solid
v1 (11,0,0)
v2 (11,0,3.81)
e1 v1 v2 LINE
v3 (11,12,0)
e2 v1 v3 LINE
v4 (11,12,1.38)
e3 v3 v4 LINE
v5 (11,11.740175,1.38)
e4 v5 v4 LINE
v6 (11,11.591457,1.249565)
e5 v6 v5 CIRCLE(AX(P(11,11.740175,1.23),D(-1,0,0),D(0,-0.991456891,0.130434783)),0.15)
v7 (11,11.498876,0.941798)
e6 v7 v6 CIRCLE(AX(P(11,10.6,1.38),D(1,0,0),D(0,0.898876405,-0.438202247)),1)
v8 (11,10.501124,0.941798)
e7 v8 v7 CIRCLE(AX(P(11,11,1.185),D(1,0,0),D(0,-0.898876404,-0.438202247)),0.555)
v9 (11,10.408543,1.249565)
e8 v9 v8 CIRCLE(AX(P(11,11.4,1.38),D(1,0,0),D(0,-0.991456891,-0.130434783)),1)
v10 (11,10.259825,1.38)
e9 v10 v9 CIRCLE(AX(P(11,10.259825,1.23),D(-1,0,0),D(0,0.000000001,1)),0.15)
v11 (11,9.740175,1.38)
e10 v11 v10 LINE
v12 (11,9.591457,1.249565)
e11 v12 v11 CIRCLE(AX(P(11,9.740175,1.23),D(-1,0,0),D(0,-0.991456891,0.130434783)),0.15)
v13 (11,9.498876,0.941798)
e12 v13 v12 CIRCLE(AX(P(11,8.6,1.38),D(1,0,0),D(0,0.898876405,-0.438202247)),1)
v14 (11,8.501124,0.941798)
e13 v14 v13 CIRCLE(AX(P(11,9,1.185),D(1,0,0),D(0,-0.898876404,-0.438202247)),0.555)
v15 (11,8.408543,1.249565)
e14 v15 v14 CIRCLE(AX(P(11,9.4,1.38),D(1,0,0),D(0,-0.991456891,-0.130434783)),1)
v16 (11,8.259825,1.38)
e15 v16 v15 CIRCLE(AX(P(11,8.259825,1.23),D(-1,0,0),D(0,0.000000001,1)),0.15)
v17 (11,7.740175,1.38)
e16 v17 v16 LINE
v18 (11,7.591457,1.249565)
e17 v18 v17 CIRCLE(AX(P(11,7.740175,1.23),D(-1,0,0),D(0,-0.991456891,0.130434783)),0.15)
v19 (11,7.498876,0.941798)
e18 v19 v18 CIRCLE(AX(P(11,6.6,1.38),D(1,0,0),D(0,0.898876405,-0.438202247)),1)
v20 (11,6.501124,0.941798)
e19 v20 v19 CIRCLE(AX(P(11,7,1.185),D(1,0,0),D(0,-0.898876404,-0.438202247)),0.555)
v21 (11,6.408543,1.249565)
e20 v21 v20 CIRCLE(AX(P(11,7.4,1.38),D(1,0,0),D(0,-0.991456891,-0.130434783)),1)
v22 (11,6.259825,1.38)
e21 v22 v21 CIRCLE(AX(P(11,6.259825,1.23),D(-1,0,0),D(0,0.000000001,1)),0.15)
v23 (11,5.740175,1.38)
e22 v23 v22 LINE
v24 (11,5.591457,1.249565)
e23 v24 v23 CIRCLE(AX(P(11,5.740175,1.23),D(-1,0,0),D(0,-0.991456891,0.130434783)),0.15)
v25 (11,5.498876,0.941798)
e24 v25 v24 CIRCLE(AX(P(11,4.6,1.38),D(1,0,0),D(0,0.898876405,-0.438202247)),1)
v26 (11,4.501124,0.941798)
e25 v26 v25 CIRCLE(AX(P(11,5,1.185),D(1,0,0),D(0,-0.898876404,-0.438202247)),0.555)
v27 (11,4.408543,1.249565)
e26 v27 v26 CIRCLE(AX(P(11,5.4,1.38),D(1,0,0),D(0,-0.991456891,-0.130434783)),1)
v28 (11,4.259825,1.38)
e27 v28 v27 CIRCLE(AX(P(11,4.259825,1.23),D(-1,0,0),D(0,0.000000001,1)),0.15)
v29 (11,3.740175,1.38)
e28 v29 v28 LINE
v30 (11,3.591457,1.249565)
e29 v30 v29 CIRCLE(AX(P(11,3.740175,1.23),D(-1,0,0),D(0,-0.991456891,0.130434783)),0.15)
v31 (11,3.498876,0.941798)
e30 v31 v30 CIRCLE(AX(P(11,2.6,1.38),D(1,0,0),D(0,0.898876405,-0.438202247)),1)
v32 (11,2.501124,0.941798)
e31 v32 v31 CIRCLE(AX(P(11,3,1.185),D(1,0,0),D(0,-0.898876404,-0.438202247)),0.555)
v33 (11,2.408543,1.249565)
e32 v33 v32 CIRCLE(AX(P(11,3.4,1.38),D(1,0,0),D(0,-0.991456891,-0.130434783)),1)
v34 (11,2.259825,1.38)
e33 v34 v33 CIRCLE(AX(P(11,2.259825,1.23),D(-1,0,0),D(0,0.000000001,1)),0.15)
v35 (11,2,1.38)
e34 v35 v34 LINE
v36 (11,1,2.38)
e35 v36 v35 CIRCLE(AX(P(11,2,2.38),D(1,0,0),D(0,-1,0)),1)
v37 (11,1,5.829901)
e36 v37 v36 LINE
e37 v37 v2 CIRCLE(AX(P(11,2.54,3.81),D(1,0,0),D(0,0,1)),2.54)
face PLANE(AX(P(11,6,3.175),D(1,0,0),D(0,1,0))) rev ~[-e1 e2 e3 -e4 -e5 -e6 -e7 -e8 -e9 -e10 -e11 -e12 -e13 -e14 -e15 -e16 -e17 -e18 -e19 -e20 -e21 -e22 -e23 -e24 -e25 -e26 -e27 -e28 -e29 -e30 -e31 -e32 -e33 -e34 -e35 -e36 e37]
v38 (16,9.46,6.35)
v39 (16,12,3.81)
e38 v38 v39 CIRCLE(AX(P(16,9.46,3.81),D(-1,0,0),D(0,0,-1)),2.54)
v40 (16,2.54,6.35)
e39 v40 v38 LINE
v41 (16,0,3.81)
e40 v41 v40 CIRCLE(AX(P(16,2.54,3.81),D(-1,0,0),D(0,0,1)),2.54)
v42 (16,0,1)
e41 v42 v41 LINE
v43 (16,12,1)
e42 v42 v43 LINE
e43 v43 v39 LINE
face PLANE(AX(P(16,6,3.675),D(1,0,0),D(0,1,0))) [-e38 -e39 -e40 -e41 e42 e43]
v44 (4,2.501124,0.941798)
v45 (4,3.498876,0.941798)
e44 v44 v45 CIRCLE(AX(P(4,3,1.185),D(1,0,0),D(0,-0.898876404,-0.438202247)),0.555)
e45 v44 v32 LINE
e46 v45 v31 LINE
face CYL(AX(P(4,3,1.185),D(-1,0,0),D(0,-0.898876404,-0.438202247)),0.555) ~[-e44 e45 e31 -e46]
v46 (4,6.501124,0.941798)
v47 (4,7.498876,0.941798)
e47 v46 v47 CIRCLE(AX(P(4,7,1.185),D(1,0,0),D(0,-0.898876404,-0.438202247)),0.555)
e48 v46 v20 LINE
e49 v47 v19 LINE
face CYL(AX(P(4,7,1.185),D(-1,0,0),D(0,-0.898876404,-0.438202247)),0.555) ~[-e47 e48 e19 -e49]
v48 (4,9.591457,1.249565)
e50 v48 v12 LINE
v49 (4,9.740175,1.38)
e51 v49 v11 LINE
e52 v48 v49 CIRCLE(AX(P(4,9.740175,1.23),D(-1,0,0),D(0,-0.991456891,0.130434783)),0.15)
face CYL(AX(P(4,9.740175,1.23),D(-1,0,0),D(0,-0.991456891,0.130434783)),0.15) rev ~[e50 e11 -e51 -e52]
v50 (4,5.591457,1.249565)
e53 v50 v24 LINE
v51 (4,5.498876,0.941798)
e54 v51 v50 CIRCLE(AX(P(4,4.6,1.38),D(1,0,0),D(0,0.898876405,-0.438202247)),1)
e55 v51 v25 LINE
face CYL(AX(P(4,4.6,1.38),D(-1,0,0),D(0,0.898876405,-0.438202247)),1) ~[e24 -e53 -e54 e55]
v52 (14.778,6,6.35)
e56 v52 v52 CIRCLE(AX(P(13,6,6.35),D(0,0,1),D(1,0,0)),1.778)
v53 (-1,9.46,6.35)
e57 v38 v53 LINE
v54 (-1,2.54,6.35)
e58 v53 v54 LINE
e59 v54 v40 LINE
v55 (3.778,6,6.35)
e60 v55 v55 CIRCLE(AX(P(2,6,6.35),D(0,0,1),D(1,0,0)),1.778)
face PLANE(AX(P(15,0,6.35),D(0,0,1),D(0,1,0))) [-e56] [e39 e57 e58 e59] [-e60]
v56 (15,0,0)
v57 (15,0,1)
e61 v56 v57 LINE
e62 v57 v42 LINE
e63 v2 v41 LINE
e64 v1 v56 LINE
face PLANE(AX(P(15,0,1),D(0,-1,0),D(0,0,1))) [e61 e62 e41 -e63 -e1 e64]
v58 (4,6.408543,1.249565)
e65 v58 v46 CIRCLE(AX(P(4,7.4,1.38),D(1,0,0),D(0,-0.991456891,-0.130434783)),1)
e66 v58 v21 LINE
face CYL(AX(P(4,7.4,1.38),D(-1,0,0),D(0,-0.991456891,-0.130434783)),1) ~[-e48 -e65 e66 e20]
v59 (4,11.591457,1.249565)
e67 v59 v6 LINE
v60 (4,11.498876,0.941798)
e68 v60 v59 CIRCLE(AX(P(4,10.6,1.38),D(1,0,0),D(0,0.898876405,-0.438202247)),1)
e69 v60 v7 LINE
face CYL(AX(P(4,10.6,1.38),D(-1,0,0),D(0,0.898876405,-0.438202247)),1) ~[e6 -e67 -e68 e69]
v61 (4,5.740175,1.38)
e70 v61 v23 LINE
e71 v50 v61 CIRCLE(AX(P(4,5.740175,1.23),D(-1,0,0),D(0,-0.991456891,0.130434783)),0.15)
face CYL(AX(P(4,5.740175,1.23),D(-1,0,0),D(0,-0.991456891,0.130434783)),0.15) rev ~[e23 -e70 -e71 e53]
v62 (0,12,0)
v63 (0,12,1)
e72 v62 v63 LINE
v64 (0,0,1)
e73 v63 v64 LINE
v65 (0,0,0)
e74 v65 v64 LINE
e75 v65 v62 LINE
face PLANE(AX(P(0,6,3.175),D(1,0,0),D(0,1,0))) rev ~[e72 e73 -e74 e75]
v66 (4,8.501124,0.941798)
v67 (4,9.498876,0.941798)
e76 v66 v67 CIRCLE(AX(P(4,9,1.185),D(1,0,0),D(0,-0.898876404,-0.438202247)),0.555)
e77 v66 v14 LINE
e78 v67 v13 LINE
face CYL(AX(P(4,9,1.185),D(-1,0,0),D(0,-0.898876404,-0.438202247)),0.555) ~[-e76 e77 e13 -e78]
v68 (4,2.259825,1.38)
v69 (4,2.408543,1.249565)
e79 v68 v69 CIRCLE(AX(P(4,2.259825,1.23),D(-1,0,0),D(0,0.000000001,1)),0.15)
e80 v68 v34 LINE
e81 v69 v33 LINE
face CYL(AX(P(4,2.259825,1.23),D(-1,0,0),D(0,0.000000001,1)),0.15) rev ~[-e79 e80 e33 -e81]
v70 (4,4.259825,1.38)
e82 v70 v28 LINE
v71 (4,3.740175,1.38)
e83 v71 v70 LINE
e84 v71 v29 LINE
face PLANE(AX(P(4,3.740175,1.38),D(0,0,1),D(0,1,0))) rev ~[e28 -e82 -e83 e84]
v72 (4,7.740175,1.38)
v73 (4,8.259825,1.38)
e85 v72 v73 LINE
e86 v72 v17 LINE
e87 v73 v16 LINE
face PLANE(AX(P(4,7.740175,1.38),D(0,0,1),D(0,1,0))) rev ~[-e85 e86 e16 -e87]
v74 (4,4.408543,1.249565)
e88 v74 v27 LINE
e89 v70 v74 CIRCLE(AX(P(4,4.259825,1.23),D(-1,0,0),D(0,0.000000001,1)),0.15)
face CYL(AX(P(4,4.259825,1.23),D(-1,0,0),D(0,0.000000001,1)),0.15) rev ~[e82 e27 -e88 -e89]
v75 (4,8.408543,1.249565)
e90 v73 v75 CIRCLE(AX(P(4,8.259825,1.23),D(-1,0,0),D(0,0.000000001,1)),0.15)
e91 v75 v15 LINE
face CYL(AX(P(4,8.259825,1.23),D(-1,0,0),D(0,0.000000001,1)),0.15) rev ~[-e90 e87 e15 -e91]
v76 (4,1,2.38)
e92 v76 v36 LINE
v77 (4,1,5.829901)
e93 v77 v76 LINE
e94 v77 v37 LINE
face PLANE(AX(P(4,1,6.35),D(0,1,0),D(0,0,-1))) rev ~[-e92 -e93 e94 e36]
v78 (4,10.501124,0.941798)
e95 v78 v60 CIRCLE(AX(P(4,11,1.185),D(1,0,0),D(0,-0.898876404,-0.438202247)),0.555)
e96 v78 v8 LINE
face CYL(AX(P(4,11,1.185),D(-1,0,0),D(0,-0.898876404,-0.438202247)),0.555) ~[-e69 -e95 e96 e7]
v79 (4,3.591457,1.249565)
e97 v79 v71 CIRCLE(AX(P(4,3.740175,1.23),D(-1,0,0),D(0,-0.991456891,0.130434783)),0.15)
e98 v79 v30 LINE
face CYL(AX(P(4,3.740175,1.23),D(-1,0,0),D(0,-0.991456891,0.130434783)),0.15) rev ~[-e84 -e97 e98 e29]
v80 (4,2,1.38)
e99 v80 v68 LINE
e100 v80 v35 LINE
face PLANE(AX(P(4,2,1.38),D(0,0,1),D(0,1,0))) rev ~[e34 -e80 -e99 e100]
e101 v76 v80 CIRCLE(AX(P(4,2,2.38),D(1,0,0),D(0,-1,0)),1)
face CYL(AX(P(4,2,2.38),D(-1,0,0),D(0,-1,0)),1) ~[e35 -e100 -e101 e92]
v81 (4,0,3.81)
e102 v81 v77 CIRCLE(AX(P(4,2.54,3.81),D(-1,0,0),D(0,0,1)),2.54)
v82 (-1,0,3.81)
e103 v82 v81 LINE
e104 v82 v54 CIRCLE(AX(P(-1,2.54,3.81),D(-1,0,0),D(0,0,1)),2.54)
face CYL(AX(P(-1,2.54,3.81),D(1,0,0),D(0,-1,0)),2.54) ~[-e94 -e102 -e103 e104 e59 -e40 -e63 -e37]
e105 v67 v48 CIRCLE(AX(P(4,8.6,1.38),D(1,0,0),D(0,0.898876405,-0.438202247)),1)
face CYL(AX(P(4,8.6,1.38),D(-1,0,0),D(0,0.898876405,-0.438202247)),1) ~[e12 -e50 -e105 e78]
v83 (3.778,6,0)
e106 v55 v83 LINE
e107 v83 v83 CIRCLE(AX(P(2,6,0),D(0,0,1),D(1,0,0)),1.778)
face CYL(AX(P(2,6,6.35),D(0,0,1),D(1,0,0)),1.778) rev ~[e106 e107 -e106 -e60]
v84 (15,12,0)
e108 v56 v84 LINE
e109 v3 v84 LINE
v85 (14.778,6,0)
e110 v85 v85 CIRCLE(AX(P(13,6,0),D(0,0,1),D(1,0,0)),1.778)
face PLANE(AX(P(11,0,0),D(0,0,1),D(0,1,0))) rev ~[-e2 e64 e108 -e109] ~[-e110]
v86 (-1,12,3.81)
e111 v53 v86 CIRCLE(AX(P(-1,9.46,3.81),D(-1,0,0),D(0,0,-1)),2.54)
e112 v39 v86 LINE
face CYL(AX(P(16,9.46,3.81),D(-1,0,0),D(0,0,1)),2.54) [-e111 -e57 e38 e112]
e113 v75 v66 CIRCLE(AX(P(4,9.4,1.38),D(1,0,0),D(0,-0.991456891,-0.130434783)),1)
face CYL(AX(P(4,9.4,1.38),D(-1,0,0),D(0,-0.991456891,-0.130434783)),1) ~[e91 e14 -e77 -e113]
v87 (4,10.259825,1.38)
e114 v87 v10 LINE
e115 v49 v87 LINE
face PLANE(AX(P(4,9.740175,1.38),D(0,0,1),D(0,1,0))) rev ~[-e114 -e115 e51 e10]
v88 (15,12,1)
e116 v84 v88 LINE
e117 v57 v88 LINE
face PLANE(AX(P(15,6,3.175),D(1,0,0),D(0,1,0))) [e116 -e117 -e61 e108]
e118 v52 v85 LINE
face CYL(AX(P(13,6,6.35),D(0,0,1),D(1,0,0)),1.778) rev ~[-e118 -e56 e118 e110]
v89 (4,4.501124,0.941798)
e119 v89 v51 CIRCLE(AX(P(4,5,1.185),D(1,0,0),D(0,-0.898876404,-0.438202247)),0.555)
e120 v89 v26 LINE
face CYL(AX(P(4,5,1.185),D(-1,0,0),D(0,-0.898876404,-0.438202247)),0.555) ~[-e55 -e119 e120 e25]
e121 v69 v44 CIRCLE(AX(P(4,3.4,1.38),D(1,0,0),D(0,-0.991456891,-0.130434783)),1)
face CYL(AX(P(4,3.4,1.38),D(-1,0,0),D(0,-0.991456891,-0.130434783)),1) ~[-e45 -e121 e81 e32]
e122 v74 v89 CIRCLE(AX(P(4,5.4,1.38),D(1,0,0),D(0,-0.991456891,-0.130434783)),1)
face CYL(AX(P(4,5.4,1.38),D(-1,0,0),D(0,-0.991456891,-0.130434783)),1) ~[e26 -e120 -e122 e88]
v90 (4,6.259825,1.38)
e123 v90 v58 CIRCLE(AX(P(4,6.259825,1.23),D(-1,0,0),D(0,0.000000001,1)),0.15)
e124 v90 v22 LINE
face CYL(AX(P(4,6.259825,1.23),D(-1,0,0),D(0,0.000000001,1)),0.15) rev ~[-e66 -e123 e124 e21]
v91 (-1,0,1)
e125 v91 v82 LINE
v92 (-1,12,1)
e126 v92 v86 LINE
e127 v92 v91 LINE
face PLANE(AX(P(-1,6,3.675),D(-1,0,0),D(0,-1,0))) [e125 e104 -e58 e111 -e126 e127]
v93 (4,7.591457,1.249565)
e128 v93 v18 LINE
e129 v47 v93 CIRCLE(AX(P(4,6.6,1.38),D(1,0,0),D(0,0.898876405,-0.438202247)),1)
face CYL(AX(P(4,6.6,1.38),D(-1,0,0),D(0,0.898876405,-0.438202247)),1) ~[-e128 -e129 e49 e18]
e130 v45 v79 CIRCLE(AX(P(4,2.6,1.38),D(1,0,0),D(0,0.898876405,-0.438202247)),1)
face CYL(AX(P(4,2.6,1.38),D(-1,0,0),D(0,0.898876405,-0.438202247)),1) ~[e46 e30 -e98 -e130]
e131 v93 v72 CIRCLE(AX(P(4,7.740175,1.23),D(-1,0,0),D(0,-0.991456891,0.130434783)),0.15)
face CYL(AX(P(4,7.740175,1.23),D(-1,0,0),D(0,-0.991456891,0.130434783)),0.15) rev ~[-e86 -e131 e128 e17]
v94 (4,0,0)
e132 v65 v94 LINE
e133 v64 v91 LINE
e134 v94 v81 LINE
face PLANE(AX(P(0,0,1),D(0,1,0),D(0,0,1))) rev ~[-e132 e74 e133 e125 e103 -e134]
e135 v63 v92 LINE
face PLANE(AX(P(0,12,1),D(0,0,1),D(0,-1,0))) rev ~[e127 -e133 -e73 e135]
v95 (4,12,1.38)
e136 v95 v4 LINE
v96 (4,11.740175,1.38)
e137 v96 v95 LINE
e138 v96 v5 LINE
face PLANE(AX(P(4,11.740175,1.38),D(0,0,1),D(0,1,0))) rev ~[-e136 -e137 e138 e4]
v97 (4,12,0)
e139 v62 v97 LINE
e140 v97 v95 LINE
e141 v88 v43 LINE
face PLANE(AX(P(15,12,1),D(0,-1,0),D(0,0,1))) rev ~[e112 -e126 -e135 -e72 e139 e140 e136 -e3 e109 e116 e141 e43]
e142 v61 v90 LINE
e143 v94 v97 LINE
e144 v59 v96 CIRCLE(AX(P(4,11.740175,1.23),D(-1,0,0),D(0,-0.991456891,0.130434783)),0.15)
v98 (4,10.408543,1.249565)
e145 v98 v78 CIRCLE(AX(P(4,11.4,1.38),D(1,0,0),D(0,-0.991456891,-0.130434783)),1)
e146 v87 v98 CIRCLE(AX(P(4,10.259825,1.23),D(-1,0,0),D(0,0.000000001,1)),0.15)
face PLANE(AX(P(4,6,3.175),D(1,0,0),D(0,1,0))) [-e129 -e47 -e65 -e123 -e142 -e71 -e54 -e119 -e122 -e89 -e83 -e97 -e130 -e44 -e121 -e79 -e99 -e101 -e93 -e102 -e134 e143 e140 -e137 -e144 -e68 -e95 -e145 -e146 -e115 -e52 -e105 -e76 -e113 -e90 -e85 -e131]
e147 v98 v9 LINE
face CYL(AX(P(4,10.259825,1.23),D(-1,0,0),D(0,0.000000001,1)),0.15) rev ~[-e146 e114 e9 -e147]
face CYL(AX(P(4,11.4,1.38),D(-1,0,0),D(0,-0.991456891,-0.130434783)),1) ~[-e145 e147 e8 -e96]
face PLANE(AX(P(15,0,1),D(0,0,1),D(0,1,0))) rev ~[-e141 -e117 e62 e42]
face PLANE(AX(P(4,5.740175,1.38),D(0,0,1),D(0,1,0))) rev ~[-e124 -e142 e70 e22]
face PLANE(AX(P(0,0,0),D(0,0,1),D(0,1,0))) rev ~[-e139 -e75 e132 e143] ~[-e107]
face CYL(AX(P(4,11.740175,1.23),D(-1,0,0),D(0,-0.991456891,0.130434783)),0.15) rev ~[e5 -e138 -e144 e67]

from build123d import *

# Parameters (mm, degrees)
F0_W      = 12
F0_H      = 6.35
F1_DEPTH  = 4
F3_DEPTH  = 7
F4_W      = 12
F4_H      = 6.35
F5_DEPTH  = 4
F6_R      = 1.778
F7_DEPTH  = 25.4
F8_W      = 12
F8_H      = 5.35
F9_DEPTH  = 1
F10_W     = 12
F10_H     = 5.35
F11_DEPTH = 1
F12_F1_R  = 2.54
F12_F2_R  = 2.54


with BuildPart() as f1:
    # F0 (on Right) → F1 (new body)
    with BuildSketch(Plane.YZ):
        with Locations((6, 3.175)):
            Rectangle(F0_W, F0_H)
    extrude(amount=F1_DEPTH)

    # F2 (on face) → F3 (join)
    with BuildSketch(Plane.YZ.offset(4)):
        with BuildLine():
            ThreePointArc((10.2598245749, 1.38), (10.3587316459, 1.3427714117), (10.4085431086, 1.2495652174))
            ThreePointArc((10.4085431086, 1.2495652174), (10.4423882857, 1.091937846), (10.5011235955, 0.9417977528))
            ThreePointArc((10.5011235955, 0.9417977528), (11, 0.63), (11.4988764045, 0.9417977528))
            ThreePointArc((11.4988764045, 0.9417977528), (11.5576117143, 1.091937846), (11.5914568914, 1.2495652174))
            ThreePointArc((11.5914568914, 1.2495652174), (11.6412683541, 1.3427714117), (11.7401754251, 1.38))
            Line((11.7401754251, 1.38), (12, 1.38))
            Line((12, 1.38), (12, 6.35))
            Line((12, 6.35), (1, 6.35))
            Line((1, 6.35), (1, 2.38))
            ThreePointArc((1, 2.38), (1.2928932188, 1.6728932188), (2, 1.38))
            Line((2, 1.38), (2.2598245749, 1.38))
            ThreePointArc((2.2598245749, 1.38), (2.3587316459, 1.3427714117), (2.4085431086, 1.2495652174))
            ThreePointArc((2.4085431086, 1.2495652174), (2.4423882857, 1.091937846), (2.5011235955, 0.9417977528))
            ThreePointArc((2.5011235955, 0.9417977528), (3, 0.63), (3.4988764045, 0.9417977528))
            ThreePointArc((3.4988764045, 0.9417977528), (3.5576117143, 1.091937846), (3.5914568914, 1.2495652174))
            ThreePointArc((3.5914568914, 1.2495652174), (3.6412683541, 1.3427714117), (3.7401754251, 1.38))
            Line((3.7401754251, 1.38), (4, 1.38))
            Line((4, 1.38), (4.2598245749, 1.38))
            ThreePointArc((4.2598245749, 1.38), (4.3587316459, 1.3427714117), (4.4085431086, 1.2495652174))
            ThreePointArc((4.4085431086, 1.2495652174), (4.4423882857, 1.091937846), (4.5011235955, 0.9417977528))
            ThreePointArc((4.5011235955, 0.9417977528), (5, 0.63), (5.4988764045, 0.9417977528))
            ThreePointArc((5.4988764045, 0.9417977528), (5.5576117143, 1.091937846), (5.5914568914, 1.2495652174))
            ThreePointArc((5.5914568914, 1.2495652174), (5.6412683541, 1.3427714117), (5.7401754251, 1.38))
            Line((5.7401754251, 1.38), (6, 1.38))
            Line((6, 1.38), (6.2598245749, 1.38))
            ThreePointArc((6.2598245749, 1.38), (6.3587316459, 1.3427714117), (6.4085431086, 1.2495652174))
            ThreePointArc((6.4085431086, 1.2495652174), (6.4423882857, 1.091937846), (6.5011235955, 0.9417977528))
            ThreePointArc((6.5011235955, 0.9417977528), (7, 0.63), (7.4988764045, 0.9417977528))
            ThreePointArc((7.4988764045, 0.9417977528), (7.5576117143, 1.091937846), (7.5914568914, 1.2495652174))
            ThreePointArc((7.5914568914, 1.2495652174), (7.6412683541, 1.3427714117), (7.7401754251, 1.38))
            Line((7.7401754251, 1.38), (8, 1.38))
            Line((8, 1.38), (8.2598245749, 1.38))
            ThreePointArc((8.2598245749, 1.38), (8.3587316459, 1.3427714117), (8.4085431086, 1.2495652174))
            ThreePointArc((8.4085431086, 1.2495652174), (8.4423882857, 1.091937846), (8.5011235955, 0.9417977528))
            ThreePointArc((8.5011235955, 0.9417977528), (9, 0.63), (9.4988764045, 0.9417977528))
            ThreePointArc((9.4988764045, 0.9417977528), (9.5576117143, 1.091937846), (9.5914568914, 1.2495652174))
            ThreePointArc((9.5914568914, 1.2495652174), (9.6412683541, 1.3427714117), (9.7401754251, 1.38))
            Line((9.7401754251, 1.38), (10, 1.38))
            Line((10, 1.38), (10.2598245749, 1.38))
        make_face()
    extrude(amount=F3_DEPTH)

    # F4 (on face) → F5 (join)
    with BuildSketch(Plane.YZ.offset(11)):
        with Locations((6, 3.175)):
            Rectangle(F4_W, F4_H)
    extrude(amount=F5_DEPTH)

    # F6 (on face) → F7 (cut)
    with BuildSketch(Plane.XY.offset(6.35)):
        with Locations((2, 6)):
            Circle(F6_R)
        with Locations((13, 6)):
            Circle(F6_R)
    extrude(amount=-F7_DEPTH, mode=Mode.SUBTRACT)

    # F8 (on face) → F9 (join)
    with BuildSketch(Plane(origin=(0, 0, 0), x_dir=(0, -1, 0), z_dir=(-1, 0, 0))):
        with Locations((-6, 3.675)):
            Rectangle(F8_W, F8_H)
    extrude(amount=F9_DEPTH)

    # F10 (on face) → F11 (join)
    with BuildSketch(Plane.YZ.offset(15)):
        with Locations((6, 3.675)):
            Rectangle(F10_W, F10_H)
    extrude(amount=F11_DEPTH)

    # F12: fillet of radius 2.54 on 3 edges, made by hand

    # F12_f1
    f12_f1_edges = [f1.edges().sort_by_distance(p)[0] for p in [
        (1.5, 0, 6.35),
    ]]
    fillet(f12_f1_edges, radius=F12_F1_R)

    # F12_f2
    f12_f2_edges = [f1.edges().sort_by_distance(p)[0] for p in [
        (7.5, 12, 6.35),
    ]]
    fillet(f12_f2_edges, radius=F12_F2_R)


solid = f1.part
